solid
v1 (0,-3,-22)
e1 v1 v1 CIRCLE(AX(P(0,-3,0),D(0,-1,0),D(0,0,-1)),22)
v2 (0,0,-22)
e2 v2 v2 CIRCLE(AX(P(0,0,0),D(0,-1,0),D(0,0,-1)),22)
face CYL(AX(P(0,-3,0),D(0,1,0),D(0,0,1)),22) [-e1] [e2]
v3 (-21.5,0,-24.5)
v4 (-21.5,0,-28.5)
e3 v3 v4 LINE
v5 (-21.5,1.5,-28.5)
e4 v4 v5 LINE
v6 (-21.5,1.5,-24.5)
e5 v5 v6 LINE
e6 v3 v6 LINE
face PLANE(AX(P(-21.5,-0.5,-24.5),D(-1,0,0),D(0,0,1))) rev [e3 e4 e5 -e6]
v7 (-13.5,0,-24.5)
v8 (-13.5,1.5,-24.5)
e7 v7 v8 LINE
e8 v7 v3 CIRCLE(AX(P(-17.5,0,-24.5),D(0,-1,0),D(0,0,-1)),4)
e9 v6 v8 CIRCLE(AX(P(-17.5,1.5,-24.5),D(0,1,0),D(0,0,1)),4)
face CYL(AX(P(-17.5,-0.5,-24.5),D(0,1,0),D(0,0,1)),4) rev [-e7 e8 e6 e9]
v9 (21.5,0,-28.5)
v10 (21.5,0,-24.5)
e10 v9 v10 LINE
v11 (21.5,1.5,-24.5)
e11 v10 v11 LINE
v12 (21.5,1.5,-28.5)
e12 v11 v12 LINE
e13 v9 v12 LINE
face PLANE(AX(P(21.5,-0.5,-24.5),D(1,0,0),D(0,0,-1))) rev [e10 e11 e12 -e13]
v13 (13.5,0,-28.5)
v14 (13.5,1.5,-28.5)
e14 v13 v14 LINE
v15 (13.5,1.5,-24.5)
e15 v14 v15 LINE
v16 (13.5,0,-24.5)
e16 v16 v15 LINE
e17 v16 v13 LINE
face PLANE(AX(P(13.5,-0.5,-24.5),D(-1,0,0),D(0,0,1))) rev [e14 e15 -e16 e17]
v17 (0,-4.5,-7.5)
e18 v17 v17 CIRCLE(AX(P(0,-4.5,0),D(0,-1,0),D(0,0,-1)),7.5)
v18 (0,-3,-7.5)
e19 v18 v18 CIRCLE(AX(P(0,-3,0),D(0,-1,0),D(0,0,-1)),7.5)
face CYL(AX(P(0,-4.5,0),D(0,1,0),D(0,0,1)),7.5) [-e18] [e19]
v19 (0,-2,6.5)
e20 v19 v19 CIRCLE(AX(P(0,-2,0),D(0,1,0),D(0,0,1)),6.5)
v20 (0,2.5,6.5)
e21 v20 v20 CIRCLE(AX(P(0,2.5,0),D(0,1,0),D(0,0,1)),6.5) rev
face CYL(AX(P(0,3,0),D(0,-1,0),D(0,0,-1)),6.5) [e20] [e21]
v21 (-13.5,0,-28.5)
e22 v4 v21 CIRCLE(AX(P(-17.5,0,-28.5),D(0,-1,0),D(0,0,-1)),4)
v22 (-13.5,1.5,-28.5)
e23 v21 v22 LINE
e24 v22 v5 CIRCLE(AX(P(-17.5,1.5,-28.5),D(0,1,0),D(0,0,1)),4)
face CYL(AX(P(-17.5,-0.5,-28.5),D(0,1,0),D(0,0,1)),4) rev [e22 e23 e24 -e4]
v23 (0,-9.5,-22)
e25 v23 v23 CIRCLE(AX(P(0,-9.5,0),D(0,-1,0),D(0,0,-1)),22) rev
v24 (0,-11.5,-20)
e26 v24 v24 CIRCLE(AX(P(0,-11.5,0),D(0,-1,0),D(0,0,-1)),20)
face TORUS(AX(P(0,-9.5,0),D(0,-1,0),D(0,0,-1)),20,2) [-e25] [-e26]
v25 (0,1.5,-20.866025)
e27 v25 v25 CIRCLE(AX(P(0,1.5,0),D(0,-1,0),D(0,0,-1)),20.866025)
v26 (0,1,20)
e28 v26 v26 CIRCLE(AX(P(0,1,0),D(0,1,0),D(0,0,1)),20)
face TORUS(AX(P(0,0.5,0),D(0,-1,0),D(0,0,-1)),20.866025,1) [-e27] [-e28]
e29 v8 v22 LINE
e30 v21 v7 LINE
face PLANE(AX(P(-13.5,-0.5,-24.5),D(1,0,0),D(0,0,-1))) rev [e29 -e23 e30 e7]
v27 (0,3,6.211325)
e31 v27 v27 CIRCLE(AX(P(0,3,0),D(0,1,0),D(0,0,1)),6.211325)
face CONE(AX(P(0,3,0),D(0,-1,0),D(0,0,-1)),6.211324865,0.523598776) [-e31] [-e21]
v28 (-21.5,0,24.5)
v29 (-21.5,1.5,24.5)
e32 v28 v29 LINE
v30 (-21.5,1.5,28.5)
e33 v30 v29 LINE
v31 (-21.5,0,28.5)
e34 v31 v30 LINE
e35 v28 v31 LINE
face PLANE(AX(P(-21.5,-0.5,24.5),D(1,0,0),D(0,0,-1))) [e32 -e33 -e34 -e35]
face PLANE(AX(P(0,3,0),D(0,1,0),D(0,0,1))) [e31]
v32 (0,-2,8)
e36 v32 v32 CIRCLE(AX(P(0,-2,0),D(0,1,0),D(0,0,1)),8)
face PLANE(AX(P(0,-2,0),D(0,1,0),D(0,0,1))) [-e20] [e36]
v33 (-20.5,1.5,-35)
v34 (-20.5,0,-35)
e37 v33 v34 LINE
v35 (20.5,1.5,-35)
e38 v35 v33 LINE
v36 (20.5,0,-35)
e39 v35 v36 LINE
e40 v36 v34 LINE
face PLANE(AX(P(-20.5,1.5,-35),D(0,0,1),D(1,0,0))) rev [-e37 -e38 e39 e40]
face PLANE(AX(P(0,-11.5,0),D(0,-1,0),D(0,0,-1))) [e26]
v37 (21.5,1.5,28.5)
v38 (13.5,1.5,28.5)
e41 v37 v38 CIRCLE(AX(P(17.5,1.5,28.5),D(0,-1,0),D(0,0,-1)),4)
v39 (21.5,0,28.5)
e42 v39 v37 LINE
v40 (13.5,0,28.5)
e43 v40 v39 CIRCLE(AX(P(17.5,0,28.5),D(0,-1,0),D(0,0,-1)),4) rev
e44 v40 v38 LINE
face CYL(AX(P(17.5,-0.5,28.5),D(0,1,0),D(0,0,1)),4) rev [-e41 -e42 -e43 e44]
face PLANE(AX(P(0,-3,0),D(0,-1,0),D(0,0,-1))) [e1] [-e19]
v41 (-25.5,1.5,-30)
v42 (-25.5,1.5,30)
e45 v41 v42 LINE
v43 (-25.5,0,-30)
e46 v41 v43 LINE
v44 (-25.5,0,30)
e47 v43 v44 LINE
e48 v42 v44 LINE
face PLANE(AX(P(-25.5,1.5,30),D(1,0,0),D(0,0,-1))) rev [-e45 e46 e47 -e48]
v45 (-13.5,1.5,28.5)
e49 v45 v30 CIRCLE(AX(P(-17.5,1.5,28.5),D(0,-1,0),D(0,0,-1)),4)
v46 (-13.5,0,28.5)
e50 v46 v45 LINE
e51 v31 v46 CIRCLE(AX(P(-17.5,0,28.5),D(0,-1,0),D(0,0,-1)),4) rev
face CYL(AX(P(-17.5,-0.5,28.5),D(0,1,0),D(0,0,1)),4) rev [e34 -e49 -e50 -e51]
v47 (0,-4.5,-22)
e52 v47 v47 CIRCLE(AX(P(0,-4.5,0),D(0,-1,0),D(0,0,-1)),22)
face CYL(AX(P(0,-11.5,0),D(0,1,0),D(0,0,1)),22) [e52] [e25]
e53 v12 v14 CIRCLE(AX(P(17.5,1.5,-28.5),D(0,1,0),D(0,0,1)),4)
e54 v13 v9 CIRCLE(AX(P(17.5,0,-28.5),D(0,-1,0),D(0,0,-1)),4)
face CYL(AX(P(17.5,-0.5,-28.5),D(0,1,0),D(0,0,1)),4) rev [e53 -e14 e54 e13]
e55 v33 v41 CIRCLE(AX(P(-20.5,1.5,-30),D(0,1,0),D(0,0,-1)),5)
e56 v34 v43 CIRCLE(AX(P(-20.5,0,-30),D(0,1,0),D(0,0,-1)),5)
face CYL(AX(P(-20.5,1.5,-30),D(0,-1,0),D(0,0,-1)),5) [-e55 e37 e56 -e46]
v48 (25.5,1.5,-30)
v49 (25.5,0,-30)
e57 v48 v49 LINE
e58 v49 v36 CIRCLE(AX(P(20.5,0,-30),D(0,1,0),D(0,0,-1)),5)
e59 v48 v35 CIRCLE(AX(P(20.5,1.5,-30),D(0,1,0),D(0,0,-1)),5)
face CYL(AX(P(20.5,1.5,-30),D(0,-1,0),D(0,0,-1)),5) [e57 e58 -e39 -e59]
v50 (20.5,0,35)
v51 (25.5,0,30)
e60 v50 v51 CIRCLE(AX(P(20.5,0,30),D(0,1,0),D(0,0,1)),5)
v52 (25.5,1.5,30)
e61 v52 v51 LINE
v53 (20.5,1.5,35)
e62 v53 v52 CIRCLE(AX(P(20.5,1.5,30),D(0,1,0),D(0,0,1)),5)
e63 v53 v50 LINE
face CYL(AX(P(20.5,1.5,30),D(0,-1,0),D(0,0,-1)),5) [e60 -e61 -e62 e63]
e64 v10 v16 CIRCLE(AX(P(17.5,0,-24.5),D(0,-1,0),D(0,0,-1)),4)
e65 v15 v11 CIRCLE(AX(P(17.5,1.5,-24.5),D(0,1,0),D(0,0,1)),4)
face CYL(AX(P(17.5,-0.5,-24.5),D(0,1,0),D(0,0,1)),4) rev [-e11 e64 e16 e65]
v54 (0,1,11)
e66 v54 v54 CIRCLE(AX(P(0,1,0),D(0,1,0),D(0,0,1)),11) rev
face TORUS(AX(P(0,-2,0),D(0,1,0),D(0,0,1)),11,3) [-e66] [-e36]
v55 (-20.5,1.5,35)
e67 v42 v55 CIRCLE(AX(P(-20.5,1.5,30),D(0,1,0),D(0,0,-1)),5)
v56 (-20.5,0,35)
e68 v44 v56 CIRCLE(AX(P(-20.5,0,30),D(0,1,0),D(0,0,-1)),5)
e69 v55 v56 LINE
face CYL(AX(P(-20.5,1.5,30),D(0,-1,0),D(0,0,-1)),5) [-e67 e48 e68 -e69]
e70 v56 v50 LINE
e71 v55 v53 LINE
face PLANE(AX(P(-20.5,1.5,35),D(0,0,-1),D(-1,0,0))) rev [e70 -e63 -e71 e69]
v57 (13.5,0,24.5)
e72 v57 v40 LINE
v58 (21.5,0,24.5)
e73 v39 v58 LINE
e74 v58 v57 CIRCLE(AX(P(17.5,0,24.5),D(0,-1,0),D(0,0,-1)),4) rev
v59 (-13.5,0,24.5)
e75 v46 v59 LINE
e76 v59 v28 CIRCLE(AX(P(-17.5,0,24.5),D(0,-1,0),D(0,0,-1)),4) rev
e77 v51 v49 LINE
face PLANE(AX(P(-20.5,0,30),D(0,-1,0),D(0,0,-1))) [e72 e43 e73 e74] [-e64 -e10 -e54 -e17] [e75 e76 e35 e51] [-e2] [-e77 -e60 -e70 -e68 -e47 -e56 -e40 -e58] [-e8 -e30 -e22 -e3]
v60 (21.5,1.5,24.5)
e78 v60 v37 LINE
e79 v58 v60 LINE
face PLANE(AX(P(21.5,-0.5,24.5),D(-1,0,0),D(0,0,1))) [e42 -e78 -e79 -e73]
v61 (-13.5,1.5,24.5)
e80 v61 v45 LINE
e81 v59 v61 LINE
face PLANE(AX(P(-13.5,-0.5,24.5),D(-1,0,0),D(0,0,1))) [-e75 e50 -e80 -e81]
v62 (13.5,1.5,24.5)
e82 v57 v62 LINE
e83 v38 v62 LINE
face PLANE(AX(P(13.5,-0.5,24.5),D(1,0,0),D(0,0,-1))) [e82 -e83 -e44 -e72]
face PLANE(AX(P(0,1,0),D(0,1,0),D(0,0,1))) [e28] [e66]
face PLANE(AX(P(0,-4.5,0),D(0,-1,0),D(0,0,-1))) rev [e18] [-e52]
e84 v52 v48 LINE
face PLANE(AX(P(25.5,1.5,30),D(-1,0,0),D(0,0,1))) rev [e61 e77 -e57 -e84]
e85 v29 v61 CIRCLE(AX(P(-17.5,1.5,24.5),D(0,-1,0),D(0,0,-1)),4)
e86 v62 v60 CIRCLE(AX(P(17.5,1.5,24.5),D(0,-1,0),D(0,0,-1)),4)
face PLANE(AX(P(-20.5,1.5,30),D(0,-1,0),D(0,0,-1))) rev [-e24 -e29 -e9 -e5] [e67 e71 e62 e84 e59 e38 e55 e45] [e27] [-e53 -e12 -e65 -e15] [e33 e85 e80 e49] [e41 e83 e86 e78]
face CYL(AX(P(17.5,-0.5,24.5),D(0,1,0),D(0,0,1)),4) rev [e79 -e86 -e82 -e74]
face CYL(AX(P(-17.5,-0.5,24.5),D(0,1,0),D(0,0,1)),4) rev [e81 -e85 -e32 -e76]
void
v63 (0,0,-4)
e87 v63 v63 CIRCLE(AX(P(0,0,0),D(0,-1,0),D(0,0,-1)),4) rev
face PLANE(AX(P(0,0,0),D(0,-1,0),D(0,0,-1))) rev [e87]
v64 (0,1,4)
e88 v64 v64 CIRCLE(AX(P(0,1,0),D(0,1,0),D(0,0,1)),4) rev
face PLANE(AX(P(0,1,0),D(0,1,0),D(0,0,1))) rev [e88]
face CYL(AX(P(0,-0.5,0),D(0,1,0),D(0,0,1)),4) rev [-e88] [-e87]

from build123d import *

# Parameters (mm, degrees)
BOSS_EXTRUDE1_DEPTH = 1.5
CUT_EXTRUDE1_DEPTH  = 2
SKETCH3_R           = 4
CUT_EXTRUDE2_DEPTH  = 2
SKETCH4_R           = 20
CUT_EXTRUDE3_DEPTH  = 0.5
FILLET1_R           = 1
SKETCH5_R           = 22
BOSS_EXTRUDE2_DEPTH = 3
SKETCH6_R           = 6.5
BOSS_EXTRUDE3_DEPTH = 2
CHAMFER1_SIZE       = 0.5
CHAMFER1_SIZE2      = 0.288675135
SKETCH7_R           = 7.5
BOSS_EXTRUDE4_DEPTH = 1.5
SKETCH8_R           = 22
BOSS_EXTRUDE5_DEPTH = 7
FILLET3_R           = 2
CUT_EXTRUDE4_START  = -3
SKETCH9_R           = 8
SKETCH9_R_2         = 6.5
CUT_EXTRUDE4_DEPTH  = 3
FILLET4_R           = 3


# Some blends are built 0.0001 mm under size
with BuildPart() as part:
    # Sketch1 → Boss-Extrude1 (new body)
    with BuildSketch(Plane(origin=(0, 0, 0), x_dir=(1, 0, 0), z_dir=(0, 1, 0))):
        with BuildLine():
            Line((-20.5, -35), (20.5, -35))
            ThreePointArc((20.5, -35), (24.035533906, -33.535533906), (25.5, -30))
            Line((25.5, -30), (25.5, 30))
            ThreePointArc((25.5, 30), (24.035533906, 33.535533906), (20.5, 35))
            Line((20.5, 35), (-20.5, 35))
            ThreePointArc((-20.5, 35), (-24.035533906, 33.535533906), (-25.5, 30))
            Line((-25.5, 30), (-25.5, -30))
            ThreePointArc((-25.5, -30), (-24.035533906, -33.535533906), (-20.5, -35))
        make_face()
    extrude(amount=BOSS_EXTRUDE1_DEPTH)

    # Sketch2 → Cut-Extrude1 (cut)
    with BuildSketch(Plane(origin=(0, 1.5, 0), x_dir=(1, 0, 0), z_dir=(0, 1, 0))):
        with BuildLine():
            Line((-21.5, 24.5), (-21.5, 28.5))
            ThreePointArc((-21.5, 28.5), (-17.5, 32.5), (-13.5, 28.5))
            Line((-13.5, 28.5), (-13.5, 24.5))
            ThreePointArc((-13.5, 24.5), (-17.5, 20.5), (-21.5, 24.5))
        make_face()
        with BuildLine():
            Line((13.5, 24.5), (13.5, 28.5))
            ThreePointArc((13.5, 28.5), (17.5, 32.5), (21.5, 28.5))
            Line((21.5, 28.5), (21.5, 24.5))
            ThreePointArc((21.5, 24.5), (17.5, 20.5), (13.5, 24.5))
        make_face()
    cut_extrude1 = extrude(amount=-CUT_EXTRUDE1_DEPTH, mode=Mode.SUBTRACT)

    # Mirror1: Cut-Extrude1 across plane
    add(cut_extrude1.mirror(Plane.XY), mode=Mode.SUBTRACT)

    # Sketch3 → Cut-Extrude2 (cut)
    with BuildSketch(Plane(origin=(0, 1.5, 0), x_dir=(1, 0, 0), z_dir=(0, 1, 0))):
        with Locations(Location((0, 0, 0), (0, 0, 270))):
            Circle(SKETCH3_R)
    extrude(amount=-CUT_EXTRUDE2_DEPTH, mode=Mode.SUBTRACT)

    # Sketch4 → Cut-Extrude3 (cut)
    with BuildSketch(Plane(origin=(0, 1.5, 0), x_dir=(1, 0, 0), z_dir=(0, 1, 0))):
        with Locations(Location((0, 0, 0), (0, 0, 270))):
            Circle(SKETCH4_R)
    extrude(amount=-CUT_EXTRUDE3_DEPTH, mode=Mode.SUBTRACT)

    # Fillet1
    # the kernel refuses this fillet: 1 mm, written as the material it takes off along each edge
    with BuildSketch(Plane(origin=(0, 1.5, 0), x_dir=(0, 0, 1), z_dir=(-1, 0, 0))) as fillet1_piece_1:
        with BuildLine():
            CenterArc((20.866025404, -1), FILLET1_R, 90, 60)
            Line((20, -0.5), (19.982679492, -0.49))
            ThreePointArc((19.982679492, -0.49), (19.98, -0.25), (19.98, 0))
            Line((19.98, 0), (20, 0.02))
            Line((20, 0.02), (20.866025404, 0.02))
            Line((20.866025404, 0.02), (20.866025404, 0))
        make_face()
    revolve(axis=Axis((0, 1.5, 0), (0, 1, 0)), mode=Mode.SUBTRACT)

    # Sketch5 → Boss-Extrude2 (add)
    with BuildSketch(Plane.XZ):
        with Locations(Location((0, 0, 0), (0, 0, 270))):
            Circle(SKETCH5_R)
    extrude(amount=BOSS_EXTRUDE2_DEPTH)

    # Sketch6 → Boss-Extrude3 (add)
    with BuildSketch(Plane(origin=(0, 1, 0), x_dir=(1, 0, 0), z_dir=(0, 1, 0))):
        with Locations(Location((0, 0, 0), (0, 0, 270))):
            Circle(SKETCH6_R)
    extrude(amount=BOSS_EXTRUDE3_DEPTH)

    # Chamfer1
    chamfer1_edges = [part.edges().sort_by_distance(p)[0] for p in [
        (0, 3, -6.5),
    ]]
    chamfer1_side = [part.faces().sort_by_distance(p)[0] for p in [
        (0, 2, -6.5),
    ]]
    chamfer(chamfer1_edges, length=CHAMFER1_SIZE, length2=CHAMFER1_SIZE2, reference=chamfer1_side[0])

    # Sketch7 → Boss-Extrude4 (add)
    with BuildSketch(Plane.XZ.offset(3)):
        with Locations(Location((0, 0, 0), (0, 0, 270))):
            Circle(SKETCH7_R)
    extrude(amount=BOSS_EXTRUDE4_DEPTH)

    # Sketch8 → Boss-Extrude5 (add)
    with BuildSketch(Plane.XZ.offset(4.5)):
        with Locations(Location((0, 0, 0), (0, 0, 270))):
            Circle(SKETCH8_R)
    extrude(amount=BOSS_EXTRUDE5_DEPTH)

    # Fillet3
    fillet3_edges = [part.edges().sort_by_distance(p)[0] for p in [
        (0, -11.5, 22),
    ]]
    fillet(fillet3_edges, radius=FILLET3_R)

    # Sketch9 → Cut-Extrude4 (cut)
    with BuildSketch(Plane(origin=(0, 1, 0), x_dir=(1, 0, 0), z_dir=(0, 1, 0)).offset(CUT_EXTRUDE4_START)):
        with Locations(Location((0, 0, 0), (0, 0, 270))):
            Circle(SKETCH9_R)
        with Locations(Location((0, 0, 0), (0, 0, 270))):
            Circle(SKETCH9_R_2, mode=Mode.SUBTRACT)
    extrude(amount=CUT_EXTRUDE4_DEPTH, mode=Mode.SUBTRACT)

    # Fillet4
    fillet4_edges = [part.edges().sort_by_distance(p)[0] for p in [
        (0, 1, -8),
    ]]
    fillet(fillet4_edges, radius=FILLET4_R - 0.0001)  # a hair under: the kernel refuses the full size


solid = part.part
